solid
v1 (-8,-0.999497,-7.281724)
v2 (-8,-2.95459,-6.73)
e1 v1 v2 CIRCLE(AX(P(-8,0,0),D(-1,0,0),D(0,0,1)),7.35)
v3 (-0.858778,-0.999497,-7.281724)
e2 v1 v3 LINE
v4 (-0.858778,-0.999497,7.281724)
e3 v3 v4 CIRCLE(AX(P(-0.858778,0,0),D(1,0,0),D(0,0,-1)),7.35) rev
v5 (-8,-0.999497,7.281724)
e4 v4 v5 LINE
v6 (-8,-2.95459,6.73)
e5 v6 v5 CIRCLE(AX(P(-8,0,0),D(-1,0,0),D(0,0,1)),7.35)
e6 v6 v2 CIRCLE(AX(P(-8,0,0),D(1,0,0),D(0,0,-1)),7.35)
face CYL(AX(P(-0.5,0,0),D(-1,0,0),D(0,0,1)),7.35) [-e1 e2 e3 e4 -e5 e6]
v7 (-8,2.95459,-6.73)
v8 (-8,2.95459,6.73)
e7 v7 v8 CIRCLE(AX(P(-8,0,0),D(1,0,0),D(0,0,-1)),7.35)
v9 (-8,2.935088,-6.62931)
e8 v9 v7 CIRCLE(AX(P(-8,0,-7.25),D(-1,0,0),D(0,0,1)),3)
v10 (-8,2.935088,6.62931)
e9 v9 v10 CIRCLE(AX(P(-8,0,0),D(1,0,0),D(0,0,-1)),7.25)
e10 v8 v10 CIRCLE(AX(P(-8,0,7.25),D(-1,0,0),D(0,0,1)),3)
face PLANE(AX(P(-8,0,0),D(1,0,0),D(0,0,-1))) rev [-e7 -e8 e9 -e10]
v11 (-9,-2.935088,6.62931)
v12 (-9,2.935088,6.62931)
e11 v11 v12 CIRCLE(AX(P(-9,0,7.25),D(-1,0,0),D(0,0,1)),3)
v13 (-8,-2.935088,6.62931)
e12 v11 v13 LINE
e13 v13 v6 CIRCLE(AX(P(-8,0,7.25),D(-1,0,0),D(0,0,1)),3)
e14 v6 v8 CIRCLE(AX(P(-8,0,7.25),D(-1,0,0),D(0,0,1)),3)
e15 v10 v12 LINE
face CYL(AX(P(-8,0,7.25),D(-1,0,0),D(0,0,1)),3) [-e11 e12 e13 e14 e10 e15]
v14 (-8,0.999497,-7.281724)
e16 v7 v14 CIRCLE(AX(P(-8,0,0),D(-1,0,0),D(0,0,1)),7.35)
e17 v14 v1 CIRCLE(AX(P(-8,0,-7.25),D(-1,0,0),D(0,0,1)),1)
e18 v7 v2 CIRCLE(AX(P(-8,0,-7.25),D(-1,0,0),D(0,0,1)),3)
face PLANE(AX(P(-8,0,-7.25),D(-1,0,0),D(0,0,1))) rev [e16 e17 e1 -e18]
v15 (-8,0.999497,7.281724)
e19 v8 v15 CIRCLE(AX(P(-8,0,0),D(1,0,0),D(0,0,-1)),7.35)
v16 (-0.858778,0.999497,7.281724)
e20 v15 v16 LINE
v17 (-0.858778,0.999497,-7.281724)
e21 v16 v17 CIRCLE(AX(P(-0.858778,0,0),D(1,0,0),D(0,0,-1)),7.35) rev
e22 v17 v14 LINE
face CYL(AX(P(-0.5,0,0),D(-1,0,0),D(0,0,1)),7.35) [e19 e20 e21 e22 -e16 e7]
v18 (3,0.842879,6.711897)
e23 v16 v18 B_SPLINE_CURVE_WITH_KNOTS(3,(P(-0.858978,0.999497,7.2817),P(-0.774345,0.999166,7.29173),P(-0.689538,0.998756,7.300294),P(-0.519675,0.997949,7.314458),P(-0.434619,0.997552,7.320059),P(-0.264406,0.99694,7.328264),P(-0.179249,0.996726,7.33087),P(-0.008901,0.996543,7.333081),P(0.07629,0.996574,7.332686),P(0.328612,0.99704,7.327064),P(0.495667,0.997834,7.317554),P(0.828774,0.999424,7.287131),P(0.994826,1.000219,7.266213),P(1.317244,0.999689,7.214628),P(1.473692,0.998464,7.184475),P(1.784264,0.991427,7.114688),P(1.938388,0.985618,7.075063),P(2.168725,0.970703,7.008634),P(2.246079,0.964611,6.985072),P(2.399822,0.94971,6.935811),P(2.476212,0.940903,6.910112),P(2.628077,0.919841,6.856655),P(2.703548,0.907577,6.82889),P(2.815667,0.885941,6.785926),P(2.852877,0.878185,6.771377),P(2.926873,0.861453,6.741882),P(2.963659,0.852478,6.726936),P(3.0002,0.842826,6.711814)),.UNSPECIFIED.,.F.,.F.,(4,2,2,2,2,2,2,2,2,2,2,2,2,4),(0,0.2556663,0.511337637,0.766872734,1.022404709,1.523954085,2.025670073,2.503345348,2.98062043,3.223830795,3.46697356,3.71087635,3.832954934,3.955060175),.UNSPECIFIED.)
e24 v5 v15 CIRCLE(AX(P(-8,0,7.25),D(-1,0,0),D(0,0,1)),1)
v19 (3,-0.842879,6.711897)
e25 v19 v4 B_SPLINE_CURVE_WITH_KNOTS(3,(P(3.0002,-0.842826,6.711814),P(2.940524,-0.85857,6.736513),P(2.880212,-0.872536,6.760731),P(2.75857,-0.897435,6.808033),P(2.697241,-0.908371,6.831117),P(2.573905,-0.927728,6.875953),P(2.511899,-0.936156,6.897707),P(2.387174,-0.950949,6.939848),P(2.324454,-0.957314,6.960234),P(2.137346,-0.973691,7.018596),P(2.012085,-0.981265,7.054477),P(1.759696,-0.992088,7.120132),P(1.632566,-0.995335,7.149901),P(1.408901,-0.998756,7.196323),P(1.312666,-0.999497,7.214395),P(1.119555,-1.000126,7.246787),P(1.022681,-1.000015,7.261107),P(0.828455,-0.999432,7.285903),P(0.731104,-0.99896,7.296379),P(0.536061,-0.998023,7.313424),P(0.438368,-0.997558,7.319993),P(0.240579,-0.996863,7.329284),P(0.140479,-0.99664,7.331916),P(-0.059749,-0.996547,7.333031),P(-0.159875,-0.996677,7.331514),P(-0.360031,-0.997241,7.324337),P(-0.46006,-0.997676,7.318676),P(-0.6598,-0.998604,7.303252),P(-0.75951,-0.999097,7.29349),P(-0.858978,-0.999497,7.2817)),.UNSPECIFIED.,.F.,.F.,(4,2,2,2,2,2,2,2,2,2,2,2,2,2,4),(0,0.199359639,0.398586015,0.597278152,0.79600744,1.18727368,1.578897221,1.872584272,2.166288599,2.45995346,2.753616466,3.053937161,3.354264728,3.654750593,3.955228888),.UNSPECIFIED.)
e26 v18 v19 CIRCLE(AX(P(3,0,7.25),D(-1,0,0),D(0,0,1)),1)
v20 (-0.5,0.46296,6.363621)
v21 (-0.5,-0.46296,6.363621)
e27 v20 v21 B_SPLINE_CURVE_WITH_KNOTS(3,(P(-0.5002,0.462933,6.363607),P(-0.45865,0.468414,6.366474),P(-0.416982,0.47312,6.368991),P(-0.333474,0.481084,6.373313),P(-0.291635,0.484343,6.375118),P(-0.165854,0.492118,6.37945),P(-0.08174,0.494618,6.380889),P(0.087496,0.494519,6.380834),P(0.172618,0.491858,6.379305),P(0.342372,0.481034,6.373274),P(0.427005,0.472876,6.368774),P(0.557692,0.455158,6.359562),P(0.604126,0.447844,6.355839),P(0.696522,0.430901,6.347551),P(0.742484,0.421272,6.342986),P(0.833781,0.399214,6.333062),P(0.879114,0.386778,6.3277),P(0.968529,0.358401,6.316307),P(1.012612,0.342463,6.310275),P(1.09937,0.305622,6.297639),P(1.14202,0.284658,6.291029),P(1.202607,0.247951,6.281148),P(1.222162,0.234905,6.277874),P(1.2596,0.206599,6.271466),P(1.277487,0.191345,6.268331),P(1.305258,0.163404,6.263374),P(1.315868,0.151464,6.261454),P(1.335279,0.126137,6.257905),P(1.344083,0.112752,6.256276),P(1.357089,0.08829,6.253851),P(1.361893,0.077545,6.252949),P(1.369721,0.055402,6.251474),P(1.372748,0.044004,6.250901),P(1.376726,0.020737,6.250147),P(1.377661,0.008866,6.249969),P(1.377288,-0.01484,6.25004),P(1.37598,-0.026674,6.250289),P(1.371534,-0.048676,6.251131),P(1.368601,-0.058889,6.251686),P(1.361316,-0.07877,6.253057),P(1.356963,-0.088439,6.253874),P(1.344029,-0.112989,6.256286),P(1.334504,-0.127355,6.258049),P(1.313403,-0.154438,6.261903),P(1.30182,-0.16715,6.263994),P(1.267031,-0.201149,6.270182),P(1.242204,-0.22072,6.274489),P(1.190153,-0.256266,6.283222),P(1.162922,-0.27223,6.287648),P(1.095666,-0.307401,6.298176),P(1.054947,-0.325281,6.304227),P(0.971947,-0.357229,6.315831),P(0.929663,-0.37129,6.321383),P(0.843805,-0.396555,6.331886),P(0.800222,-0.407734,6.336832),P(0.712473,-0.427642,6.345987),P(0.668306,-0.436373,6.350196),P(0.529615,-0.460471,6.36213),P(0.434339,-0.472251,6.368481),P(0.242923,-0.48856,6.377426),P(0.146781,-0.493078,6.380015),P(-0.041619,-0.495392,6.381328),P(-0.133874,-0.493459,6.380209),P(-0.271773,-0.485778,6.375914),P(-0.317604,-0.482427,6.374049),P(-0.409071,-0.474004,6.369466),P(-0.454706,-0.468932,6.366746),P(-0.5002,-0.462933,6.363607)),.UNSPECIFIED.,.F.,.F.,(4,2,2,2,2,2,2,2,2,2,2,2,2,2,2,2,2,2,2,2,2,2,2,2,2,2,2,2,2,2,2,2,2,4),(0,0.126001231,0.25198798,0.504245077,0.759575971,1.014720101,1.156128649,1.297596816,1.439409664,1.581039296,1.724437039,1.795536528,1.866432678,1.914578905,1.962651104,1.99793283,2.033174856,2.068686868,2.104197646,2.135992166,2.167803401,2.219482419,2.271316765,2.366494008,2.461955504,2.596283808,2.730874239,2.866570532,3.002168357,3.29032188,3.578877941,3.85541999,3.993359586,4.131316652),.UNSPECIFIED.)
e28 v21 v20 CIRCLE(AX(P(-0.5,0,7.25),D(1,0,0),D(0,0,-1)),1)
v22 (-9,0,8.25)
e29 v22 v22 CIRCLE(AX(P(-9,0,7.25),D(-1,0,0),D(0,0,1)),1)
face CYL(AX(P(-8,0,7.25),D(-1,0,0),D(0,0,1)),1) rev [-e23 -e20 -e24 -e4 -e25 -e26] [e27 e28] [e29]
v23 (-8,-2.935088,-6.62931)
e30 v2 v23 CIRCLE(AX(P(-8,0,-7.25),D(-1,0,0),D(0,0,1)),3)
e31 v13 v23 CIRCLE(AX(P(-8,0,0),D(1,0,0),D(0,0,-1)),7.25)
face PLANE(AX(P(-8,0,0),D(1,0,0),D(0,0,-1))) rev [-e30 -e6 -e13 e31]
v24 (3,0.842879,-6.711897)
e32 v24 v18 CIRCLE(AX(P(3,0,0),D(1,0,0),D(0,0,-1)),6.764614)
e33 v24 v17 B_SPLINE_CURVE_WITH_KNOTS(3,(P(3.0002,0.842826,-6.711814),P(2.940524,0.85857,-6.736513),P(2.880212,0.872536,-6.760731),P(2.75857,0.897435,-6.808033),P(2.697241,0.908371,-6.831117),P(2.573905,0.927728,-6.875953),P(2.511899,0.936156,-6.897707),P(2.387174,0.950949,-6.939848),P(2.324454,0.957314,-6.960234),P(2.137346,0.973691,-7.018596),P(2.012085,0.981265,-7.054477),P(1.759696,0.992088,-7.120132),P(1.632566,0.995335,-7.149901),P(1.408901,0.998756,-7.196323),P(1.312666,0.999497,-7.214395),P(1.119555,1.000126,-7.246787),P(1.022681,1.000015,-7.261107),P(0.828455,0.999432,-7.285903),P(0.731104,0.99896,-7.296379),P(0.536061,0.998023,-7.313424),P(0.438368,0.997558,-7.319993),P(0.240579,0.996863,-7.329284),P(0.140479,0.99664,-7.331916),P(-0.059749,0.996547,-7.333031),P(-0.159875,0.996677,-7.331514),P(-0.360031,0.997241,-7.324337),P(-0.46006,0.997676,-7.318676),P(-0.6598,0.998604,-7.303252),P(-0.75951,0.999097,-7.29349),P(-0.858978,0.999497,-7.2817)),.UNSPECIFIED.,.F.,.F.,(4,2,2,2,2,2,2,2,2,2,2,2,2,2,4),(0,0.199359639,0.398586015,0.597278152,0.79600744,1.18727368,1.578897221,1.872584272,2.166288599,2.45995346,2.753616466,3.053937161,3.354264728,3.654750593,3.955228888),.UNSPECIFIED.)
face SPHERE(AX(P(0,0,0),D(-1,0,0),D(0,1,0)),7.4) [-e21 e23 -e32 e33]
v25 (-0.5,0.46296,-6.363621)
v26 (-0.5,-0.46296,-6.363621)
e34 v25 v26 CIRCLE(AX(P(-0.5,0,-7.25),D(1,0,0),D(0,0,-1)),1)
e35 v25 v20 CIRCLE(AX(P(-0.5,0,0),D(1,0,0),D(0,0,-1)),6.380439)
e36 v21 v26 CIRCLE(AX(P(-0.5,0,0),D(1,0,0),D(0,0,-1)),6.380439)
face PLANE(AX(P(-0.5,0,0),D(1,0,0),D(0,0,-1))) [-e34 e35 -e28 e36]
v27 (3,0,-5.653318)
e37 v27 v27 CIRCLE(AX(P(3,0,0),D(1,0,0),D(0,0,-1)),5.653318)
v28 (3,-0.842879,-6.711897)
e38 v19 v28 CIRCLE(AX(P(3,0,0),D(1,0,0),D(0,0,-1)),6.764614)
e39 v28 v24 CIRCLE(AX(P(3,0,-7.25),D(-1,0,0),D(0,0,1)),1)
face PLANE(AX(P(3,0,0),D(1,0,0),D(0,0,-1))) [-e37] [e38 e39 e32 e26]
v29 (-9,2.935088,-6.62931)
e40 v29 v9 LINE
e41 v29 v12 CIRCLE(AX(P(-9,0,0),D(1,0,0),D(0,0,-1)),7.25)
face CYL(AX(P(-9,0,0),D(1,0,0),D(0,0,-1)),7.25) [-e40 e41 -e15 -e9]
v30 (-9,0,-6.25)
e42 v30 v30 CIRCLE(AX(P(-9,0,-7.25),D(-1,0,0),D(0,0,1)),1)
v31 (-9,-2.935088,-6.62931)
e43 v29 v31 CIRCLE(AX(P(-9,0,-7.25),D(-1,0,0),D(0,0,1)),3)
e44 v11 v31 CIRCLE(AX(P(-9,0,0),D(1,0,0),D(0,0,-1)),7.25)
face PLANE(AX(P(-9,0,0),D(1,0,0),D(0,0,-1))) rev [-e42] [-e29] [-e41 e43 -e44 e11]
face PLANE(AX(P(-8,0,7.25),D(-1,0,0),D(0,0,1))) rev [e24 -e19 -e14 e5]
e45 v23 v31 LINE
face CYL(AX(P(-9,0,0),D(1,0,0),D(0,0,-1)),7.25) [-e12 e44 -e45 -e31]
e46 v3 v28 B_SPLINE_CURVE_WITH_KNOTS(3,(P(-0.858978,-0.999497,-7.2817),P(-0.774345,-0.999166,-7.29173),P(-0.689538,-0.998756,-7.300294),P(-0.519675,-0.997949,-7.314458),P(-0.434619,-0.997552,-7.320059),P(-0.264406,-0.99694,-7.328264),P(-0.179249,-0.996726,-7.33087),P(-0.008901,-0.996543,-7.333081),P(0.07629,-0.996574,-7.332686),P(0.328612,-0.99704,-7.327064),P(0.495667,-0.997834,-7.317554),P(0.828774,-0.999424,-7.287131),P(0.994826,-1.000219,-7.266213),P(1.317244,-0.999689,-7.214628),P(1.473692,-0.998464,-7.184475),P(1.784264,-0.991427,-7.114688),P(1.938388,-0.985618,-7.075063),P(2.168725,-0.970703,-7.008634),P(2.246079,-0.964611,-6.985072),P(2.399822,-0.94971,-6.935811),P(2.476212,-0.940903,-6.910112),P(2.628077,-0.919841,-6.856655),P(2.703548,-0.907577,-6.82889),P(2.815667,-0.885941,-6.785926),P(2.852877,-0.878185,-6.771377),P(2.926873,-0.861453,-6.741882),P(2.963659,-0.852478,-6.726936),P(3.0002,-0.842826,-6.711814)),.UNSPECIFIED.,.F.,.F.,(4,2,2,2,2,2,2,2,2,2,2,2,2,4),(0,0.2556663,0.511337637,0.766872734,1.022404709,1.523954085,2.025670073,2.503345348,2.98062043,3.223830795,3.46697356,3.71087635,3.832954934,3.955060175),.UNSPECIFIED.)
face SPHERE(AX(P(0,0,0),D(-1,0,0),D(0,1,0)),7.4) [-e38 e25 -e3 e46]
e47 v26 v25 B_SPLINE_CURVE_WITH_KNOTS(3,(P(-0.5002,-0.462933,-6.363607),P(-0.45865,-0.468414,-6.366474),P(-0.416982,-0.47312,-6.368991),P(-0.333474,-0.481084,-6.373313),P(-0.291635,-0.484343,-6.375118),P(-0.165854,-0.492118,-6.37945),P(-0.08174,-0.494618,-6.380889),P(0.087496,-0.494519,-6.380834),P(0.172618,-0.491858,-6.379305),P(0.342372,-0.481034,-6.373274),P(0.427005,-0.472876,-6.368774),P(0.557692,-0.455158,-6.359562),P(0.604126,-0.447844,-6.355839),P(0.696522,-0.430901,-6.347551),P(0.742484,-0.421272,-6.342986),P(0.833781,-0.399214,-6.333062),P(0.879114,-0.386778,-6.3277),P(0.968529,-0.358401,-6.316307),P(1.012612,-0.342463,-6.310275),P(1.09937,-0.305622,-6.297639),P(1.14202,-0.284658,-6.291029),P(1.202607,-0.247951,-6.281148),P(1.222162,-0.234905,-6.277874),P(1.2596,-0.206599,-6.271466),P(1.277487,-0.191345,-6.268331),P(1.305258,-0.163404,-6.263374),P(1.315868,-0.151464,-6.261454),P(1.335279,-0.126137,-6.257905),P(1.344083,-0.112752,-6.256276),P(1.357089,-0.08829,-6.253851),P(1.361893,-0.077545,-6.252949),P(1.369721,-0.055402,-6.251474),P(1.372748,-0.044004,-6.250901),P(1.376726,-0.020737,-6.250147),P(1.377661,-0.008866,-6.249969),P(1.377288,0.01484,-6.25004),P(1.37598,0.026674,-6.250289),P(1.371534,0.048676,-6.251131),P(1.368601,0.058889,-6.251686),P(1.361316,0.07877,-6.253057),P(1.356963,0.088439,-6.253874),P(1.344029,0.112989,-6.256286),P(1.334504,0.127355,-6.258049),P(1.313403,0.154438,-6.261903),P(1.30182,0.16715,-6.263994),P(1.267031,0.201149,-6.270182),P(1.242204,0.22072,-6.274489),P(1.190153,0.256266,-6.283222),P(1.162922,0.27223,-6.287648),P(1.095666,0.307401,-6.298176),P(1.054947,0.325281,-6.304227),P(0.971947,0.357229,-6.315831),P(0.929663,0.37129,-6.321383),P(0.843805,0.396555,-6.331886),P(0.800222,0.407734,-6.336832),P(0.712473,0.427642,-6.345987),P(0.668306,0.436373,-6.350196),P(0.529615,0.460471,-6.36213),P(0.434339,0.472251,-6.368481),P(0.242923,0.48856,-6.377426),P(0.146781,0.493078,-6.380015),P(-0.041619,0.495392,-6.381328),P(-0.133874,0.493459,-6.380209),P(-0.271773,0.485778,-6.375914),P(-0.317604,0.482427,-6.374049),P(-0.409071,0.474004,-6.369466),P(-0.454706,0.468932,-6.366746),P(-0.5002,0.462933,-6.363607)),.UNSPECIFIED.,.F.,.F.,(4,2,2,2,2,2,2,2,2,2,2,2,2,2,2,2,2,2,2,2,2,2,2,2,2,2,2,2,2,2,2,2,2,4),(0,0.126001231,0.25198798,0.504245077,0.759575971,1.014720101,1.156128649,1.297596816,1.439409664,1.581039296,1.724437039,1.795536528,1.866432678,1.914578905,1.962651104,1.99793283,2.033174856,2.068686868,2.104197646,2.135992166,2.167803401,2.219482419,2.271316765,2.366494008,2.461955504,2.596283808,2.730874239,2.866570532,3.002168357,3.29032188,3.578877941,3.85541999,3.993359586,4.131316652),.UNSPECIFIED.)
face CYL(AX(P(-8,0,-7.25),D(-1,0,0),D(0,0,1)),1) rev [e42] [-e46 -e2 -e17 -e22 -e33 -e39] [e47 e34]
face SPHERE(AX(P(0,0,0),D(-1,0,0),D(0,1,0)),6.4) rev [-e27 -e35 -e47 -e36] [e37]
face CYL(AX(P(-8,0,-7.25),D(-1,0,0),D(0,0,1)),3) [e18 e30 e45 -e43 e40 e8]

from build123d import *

# Parameters (mm, degrees)
ENL_V_START             = 3
ESQUISSE2_W             = 20.168692272
ESQUISSE2_H             = 19.901202985
ENL_V_MAT_EXTRU_1_DEPTH = 10
BOSS_EXTRU_1_START      = -11
ESQUISSE3_R             = 7.25
BOSS_EXTRU_1_DEPTH      = 1
ESQUISSE4_R             = 7.35
BOSS_EXTRU_2_DEPTH      = 7.5
ESQUISSE5_R             = 3
ESQUISSE5_R_2           = 1
BOSS_EXTRU_3_DEPTH      = 1
ESQUISSE6_R             = 1
ENL_V_MAT_EXTRU_2_DEPTH = 18.430504869


with BuildPart() as part:
    # Esquisse1 → Révolution1 (revolve)
    with BuildSketch(Plane.XY):
        with BuildLine():
            ThreePointArc((-6.4, 0), (0, 6.4), (6.4, 0))
            Line((6.4, 0), (7.4, 0))
            ThreePointArc((7.4, 0), (0, 7.4), (-7.4, 0))
            Line((-7.4, 0), (-6.4, 0))
        make_face()
    revolve(axis=Axis((-7.4, 0, 0), (1, 0, 0)))

    # Esquisse2 → Enlèv. mat.-Extru.1 (cut)
    with BuildSketch(Plane(origin=(0, 0, 0), x_dir=(0, 0, -1), z_dir=(1, 0, 0)).offset(ENL_V_START)):
        with Locations((-0.294238216, 0.080246787)):
            Rectangle(ESQUISSE2_W, ESQUISSE2_H)
    extrude(amount=ENL_V_MAT_EXTRU_1_DEPTH, mode=Mode.SUBTRACT)



with BuildPart() as body_2:
    # Esquisse3 → Boss.-Extru.1 (new body)
    with BuildSketch(Plane(origin=(3, 0, 0), x_dir=(0, 0, -1), z_dir=(1, 0, 0)).offset(BOSS_EXTRU_1_START)):
        Circle(ESQUISSE3_R)
    extrude(amount=-BOSS_EXTRU_1_DEPTH)


with BuildPart() as part_1:
    add(part.part)

    add(body_2.part)  # Boss.-Extru.2 merges body 2
    # Esquisse4 → Boss.-Extru.2 (add)
    with BuildSketch(Plane(origin=(-8, 0, 0), x_dir=(0, 0, -1), z_dir=(1, 0, 0))):
        Circle(ESQUISSE4_R)
    extrude(amount=BOSS_EXTRU_2_DEPTH)

    # Esquisse5 → Boss.-Extru.3 (add)
    # profile 1 of 2: a face of its own
    with BuildSketch(Plane.ZY.offset(9)):
        with Locations((7.25, 0)):
            Circle(ESQUISSE5_R)
        with Locations((7.25, 0)):
            Circle(ESQUISSE5_R_2, mode=Mode.SUBTRACT)
    # profile 2 of 2: a face of its own
    with BuildSketch(Plane.ZY.offset(9)):
        with Locations((-7.25, 0)):
            Circle(ESQUISSE5_R)
        with Locations((-7.25, 0)):
            Circle(ESQUISSE5_R_2, mode=Mode.SUBTRACT)
    extrude(amount=-BOSS_EXTRU_3_DEPTH)

    # Esquisse6 → Enlèv. mat.-Extru.2 (cut, through all)
    with BuildSketch(Plane.ZY.offset(9)):
        with Locations((-7.25, 0)):
            Circle(ESQUISSE6_R)
        with Locations((7.25, 0)):
            Circle(ESQUISSE6_R)
    extrude(amount=-ENL_V_MAT_EXTRU_2_DEPTH, mode=Mode.SUBTRACT)


solid = part_1.part
